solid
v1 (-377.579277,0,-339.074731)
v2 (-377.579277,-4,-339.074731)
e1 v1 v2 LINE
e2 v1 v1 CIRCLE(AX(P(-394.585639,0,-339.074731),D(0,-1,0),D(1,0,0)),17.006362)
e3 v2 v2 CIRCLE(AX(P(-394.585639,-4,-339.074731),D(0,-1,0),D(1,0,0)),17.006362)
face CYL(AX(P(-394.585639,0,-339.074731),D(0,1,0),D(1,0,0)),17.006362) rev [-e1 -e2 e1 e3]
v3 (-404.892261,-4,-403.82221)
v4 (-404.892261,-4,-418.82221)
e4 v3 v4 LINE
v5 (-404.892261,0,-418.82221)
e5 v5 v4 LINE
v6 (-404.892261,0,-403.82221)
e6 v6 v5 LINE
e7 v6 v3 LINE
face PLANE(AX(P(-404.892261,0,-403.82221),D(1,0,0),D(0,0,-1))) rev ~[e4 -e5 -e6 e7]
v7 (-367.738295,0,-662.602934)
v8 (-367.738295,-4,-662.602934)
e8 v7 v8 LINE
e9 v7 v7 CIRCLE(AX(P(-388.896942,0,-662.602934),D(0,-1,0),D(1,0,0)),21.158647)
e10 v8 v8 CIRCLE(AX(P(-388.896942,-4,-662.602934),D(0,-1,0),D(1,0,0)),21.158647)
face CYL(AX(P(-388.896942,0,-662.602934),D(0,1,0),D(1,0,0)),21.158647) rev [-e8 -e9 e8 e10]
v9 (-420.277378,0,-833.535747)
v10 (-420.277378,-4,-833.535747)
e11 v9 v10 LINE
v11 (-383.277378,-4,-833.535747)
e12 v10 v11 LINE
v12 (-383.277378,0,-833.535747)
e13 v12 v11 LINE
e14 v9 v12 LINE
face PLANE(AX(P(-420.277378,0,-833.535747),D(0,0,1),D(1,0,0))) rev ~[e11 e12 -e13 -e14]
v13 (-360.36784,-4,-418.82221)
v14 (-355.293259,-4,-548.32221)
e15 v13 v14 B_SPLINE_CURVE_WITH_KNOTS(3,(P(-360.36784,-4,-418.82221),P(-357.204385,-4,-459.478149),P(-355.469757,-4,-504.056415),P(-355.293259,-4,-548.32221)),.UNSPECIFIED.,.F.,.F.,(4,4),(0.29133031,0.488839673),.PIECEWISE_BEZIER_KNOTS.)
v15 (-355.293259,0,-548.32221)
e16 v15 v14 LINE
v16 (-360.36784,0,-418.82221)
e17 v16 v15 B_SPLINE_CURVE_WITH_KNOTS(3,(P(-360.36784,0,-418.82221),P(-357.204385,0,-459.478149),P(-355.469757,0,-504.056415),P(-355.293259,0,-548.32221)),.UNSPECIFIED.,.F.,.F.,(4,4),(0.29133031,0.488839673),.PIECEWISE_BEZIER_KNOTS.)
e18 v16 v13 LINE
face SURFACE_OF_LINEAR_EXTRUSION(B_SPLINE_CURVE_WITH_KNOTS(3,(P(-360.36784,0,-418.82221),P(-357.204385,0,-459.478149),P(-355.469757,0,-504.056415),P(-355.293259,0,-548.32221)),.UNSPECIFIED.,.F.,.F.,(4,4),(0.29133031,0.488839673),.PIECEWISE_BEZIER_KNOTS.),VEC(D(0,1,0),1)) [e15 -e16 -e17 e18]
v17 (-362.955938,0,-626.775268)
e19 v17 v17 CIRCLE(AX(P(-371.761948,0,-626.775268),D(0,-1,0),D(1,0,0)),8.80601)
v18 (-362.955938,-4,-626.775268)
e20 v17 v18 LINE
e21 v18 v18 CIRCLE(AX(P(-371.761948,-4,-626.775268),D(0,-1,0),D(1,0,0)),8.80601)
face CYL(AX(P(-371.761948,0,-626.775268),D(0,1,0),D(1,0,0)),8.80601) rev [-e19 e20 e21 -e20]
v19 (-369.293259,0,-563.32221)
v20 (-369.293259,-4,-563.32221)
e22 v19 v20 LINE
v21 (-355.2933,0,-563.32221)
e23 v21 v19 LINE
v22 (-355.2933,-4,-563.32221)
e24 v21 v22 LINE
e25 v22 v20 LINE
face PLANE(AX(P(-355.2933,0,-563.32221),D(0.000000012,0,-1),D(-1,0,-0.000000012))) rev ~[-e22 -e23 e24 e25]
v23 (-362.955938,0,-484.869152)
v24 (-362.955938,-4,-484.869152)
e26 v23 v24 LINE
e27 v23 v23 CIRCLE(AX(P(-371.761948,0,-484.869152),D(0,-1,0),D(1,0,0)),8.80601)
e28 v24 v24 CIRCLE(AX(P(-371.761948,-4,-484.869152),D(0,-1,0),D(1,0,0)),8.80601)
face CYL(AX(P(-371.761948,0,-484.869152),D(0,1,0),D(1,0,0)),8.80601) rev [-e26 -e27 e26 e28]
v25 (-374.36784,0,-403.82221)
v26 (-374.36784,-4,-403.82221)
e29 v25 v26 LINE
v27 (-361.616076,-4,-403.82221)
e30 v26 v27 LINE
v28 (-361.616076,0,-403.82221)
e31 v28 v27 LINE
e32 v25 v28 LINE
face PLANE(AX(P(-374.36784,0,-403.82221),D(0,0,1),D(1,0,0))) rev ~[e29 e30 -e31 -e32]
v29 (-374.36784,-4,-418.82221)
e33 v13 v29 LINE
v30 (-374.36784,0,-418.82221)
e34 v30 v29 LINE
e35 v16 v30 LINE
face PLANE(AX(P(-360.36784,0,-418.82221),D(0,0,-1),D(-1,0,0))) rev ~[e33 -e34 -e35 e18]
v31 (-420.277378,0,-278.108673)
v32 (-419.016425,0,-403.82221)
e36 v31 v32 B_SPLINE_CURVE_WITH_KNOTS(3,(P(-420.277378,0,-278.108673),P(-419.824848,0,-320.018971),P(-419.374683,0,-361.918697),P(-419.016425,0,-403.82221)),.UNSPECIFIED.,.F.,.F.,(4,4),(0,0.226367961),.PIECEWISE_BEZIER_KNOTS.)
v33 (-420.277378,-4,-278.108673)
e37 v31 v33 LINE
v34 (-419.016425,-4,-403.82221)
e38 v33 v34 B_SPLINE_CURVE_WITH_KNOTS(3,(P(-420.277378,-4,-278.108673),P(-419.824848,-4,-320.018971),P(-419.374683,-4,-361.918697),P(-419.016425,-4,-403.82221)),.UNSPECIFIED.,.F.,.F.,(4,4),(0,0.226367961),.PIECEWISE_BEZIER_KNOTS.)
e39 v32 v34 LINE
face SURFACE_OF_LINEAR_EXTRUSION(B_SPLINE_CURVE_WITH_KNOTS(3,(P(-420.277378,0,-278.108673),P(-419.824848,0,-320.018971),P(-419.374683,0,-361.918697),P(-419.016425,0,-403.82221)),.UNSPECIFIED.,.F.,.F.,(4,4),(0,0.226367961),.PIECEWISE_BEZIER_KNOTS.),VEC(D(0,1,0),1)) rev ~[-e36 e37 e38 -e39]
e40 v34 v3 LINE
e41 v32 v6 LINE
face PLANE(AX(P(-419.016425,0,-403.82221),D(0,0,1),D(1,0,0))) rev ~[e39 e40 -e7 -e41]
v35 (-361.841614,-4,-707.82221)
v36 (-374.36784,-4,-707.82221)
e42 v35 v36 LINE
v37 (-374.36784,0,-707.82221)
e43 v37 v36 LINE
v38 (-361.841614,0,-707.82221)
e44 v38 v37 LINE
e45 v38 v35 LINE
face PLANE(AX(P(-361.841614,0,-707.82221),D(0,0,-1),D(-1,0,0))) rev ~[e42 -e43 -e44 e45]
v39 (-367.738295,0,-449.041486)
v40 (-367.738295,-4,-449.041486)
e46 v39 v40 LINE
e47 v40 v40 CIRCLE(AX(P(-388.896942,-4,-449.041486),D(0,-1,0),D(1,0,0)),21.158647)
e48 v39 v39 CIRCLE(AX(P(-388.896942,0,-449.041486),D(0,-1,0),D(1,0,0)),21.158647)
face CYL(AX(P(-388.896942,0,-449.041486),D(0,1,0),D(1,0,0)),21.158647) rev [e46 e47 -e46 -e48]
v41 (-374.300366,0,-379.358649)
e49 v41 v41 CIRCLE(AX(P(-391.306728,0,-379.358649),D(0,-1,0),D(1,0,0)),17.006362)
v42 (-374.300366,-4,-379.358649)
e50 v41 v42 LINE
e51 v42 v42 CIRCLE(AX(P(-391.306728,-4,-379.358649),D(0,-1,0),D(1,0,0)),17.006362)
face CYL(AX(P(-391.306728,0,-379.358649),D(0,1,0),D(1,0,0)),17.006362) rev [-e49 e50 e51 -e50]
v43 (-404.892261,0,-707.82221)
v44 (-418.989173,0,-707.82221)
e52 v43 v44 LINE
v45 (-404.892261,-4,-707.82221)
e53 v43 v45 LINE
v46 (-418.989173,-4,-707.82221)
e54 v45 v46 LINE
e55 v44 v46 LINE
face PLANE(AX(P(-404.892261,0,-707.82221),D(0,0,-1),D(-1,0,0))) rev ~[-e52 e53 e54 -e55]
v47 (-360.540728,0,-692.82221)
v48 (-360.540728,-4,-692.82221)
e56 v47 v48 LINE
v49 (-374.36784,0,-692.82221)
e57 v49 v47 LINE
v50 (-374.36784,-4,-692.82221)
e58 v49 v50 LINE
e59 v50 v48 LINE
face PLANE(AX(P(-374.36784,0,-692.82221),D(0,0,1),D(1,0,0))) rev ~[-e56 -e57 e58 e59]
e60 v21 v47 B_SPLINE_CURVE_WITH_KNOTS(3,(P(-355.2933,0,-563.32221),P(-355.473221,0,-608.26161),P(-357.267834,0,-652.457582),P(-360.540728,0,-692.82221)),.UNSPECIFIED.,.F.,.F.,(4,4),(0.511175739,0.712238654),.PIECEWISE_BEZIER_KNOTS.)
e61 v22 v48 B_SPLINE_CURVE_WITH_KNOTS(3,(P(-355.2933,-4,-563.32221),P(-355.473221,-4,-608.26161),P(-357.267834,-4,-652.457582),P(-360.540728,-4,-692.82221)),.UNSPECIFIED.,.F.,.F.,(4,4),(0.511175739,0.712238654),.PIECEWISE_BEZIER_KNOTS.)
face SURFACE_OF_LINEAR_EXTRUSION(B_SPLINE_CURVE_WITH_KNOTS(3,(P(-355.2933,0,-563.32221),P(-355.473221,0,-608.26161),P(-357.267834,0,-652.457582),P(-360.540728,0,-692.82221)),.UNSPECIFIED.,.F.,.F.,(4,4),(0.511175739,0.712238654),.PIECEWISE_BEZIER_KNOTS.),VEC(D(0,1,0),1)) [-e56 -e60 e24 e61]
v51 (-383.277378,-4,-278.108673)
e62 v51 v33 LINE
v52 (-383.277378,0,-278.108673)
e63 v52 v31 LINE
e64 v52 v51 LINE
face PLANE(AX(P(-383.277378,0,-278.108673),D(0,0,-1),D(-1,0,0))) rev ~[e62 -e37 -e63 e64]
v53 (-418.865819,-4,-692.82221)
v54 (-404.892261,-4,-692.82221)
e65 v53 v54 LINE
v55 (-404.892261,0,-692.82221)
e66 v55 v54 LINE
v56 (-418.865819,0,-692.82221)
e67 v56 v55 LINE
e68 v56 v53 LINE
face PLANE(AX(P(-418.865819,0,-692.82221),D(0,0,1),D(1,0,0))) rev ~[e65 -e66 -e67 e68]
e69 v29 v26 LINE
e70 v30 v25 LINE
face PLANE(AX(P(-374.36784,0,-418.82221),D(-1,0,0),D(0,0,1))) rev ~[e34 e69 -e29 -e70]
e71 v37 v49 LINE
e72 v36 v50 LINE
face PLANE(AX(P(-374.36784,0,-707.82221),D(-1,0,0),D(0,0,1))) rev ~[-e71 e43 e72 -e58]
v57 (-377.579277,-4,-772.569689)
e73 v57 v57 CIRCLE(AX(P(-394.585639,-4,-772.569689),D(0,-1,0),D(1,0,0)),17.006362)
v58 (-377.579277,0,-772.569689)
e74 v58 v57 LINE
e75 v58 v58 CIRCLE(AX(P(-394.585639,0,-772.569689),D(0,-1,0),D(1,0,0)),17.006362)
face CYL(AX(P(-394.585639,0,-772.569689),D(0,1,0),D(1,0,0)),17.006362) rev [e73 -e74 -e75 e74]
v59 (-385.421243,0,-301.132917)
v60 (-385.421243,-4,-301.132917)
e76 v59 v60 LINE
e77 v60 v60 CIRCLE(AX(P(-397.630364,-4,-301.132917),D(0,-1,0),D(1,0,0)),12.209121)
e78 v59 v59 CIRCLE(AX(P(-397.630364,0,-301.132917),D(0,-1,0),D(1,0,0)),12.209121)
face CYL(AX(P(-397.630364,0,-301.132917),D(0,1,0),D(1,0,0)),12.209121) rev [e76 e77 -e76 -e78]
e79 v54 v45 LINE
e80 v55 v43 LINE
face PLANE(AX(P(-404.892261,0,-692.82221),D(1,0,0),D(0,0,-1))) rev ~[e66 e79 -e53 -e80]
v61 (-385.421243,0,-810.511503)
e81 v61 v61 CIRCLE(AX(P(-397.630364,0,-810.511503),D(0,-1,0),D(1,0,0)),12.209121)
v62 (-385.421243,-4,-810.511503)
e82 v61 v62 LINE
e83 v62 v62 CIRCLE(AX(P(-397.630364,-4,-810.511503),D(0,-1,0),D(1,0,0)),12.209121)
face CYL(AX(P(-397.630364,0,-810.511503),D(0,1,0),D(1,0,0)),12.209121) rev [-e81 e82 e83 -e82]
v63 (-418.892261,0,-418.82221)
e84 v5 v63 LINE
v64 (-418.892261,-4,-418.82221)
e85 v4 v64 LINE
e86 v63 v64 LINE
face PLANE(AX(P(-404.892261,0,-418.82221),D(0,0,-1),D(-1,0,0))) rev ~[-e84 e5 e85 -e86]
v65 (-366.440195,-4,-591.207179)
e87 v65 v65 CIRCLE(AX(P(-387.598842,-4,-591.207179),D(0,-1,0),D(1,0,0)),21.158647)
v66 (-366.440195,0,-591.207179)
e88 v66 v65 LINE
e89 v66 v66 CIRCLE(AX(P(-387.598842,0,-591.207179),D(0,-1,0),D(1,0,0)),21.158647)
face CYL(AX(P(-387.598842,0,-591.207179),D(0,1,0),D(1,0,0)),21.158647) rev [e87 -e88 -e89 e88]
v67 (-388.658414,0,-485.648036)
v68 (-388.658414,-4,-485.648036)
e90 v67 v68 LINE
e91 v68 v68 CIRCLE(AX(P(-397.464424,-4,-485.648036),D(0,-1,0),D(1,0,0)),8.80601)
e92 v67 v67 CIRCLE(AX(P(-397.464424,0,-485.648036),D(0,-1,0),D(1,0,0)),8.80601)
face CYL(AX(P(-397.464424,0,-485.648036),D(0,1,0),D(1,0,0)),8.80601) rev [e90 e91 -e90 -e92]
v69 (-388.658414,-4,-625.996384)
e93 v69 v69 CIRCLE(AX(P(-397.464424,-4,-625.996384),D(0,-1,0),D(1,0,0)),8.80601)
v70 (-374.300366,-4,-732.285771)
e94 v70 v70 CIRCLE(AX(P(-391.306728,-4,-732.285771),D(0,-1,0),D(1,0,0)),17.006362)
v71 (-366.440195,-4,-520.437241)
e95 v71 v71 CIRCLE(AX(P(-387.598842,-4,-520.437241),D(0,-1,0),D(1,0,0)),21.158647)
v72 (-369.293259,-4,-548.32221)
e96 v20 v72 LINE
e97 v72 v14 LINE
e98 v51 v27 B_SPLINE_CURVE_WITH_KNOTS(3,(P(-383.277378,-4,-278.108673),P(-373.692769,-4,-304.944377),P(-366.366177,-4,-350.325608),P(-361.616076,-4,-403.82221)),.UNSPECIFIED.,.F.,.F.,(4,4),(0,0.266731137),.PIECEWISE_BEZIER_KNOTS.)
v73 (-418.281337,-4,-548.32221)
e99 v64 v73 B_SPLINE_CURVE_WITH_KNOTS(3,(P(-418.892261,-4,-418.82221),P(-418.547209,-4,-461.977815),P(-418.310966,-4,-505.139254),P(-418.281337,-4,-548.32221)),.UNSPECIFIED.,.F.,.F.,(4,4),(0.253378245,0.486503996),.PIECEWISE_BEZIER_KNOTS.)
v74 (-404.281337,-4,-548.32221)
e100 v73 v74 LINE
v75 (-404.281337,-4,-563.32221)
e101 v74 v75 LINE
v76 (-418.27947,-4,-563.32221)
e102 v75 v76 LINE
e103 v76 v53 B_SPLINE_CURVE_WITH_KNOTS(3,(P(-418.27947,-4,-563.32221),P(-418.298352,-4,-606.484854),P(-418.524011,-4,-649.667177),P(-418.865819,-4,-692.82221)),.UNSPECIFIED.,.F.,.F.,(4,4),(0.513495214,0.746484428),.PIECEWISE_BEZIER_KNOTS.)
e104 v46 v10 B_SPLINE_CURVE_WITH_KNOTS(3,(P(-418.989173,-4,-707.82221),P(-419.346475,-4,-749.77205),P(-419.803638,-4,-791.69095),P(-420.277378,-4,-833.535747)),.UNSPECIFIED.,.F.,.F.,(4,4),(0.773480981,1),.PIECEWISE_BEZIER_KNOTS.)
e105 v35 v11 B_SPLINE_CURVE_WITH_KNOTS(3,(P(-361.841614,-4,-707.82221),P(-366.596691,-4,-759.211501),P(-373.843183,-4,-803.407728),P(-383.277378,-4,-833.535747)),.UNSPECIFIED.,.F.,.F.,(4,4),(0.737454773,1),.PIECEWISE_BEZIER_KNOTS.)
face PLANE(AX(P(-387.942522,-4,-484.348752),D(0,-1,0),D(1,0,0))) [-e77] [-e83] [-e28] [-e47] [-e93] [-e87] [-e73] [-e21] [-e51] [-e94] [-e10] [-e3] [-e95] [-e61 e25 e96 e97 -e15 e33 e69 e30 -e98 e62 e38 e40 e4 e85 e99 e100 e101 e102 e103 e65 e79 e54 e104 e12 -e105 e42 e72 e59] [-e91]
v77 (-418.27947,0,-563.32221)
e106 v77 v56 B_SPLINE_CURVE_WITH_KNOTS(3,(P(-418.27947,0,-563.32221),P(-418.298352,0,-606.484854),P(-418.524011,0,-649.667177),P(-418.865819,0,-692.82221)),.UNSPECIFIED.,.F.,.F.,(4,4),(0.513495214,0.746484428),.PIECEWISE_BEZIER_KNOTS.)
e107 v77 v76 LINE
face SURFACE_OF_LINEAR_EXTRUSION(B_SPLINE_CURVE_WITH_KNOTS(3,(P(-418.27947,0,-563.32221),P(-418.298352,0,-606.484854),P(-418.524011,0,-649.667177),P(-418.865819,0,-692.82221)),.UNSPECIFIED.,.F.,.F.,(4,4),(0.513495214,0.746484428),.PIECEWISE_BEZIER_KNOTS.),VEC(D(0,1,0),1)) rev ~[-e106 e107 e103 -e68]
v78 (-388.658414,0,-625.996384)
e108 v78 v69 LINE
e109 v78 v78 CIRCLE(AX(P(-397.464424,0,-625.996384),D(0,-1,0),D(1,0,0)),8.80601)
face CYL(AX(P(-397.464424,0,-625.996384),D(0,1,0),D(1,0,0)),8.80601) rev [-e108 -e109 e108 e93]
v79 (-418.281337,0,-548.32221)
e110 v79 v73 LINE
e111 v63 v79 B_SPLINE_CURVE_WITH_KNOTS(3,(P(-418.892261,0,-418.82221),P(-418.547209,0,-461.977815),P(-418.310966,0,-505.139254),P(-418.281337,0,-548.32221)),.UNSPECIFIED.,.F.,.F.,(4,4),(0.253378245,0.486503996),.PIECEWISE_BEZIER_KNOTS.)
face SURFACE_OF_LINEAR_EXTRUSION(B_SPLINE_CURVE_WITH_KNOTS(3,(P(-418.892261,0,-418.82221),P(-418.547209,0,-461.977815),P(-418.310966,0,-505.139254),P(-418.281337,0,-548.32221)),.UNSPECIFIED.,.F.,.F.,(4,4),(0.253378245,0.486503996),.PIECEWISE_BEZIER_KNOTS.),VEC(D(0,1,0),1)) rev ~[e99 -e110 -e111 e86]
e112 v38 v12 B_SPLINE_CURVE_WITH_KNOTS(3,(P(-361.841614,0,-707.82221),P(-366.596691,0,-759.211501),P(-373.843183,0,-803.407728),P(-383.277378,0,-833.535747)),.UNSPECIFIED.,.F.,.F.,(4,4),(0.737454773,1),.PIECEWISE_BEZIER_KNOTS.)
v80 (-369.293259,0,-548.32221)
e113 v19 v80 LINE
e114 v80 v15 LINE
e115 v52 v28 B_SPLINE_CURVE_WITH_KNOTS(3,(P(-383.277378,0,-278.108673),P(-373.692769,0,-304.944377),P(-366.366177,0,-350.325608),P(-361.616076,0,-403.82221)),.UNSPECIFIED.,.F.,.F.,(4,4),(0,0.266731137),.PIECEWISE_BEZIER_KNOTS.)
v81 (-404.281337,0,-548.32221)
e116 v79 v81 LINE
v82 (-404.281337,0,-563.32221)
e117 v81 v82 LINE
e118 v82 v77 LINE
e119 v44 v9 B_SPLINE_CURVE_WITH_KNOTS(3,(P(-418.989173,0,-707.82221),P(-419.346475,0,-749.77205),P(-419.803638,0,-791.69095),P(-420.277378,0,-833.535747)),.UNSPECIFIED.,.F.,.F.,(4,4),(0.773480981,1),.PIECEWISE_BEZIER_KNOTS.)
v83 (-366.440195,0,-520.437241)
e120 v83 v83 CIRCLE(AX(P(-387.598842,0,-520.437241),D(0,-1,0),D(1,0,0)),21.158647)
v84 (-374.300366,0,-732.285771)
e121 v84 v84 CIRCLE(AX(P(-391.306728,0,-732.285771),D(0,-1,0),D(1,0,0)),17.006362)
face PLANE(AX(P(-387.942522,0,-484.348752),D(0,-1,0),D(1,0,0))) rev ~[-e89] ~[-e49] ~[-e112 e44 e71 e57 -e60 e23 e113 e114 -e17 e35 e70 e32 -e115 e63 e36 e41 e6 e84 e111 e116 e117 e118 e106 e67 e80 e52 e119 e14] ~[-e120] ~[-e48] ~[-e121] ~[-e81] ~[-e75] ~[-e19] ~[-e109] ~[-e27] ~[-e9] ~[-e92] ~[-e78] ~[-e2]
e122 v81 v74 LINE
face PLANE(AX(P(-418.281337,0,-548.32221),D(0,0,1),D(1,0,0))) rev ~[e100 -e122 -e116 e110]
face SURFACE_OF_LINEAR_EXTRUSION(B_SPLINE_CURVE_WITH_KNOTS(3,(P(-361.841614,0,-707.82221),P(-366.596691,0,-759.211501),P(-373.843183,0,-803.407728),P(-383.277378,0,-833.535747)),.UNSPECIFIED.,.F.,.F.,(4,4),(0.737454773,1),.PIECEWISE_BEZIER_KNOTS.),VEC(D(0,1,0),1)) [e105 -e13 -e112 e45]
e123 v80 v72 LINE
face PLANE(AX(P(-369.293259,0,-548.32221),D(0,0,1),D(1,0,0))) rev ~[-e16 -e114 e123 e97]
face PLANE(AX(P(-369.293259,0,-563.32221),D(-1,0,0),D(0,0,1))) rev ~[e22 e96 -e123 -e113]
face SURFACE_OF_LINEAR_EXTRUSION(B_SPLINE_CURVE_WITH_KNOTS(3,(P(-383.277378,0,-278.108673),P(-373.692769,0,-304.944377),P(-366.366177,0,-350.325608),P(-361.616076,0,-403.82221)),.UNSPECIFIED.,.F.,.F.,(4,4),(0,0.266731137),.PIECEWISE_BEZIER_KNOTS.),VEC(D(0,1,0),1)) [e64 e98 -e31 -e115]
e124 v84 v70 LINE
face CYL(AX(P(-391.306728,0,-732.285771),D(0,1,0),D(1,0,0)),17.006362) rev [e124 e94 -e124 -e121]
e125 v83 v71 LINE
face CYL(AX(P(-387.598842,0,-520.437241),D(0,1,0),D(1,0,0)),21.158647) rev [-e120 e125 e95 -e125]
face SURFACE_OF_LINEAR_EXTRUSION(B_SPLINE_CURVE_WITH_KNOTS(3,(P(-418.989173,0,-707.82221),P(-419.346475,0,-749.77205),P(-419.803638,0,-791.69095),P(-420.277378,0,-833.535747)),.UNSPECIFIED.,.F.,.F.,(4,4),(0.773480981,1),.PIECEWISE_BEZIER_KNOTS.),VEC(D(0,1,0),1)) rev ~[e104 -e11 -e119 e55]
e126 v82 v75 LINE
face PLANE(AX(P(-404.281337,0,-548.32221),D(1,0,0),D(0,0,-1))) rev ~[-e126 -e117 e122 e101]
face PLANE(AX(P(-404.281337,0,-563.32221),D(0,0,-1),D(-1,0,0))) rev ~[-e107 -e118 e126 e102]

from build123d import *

# Parameters (mm, degrees)
F0_R     = 21.1586469213
F0_R_2   = 8.806010366
F0_R_3   = 12.2091210128
F0_R_4   = 17.006361888
F1_DEPTH = 4


# Not quite as in the source:
# - ends of sketch curves that miss each other by under 0.0002 mm in the source are joined


with BuildPart() as f1:
    # F0 (on Front) → F1 (new body)
    with BuildSketch(Plane.XZ):
        with BuildLine():
            Line((-404.2813370244, -555.8222100041), (-369.2932587578, -555.8222100041))
            Line((-369.2932587578, -555.8222100041), (-369.2932587578, -548.3222100041))
            Line((-369.2932587578, -548.3222100041), (-355.2932587578, -548.3222100041))
            add(Edge.make_bspline(
                [(-360.3678395822, -418.8222100041), (-357.2043853814, -459.4781491099), (-355.4697568796, -504.0564149856), (-355.2932587578, -548.3222100041)],
                knots=[0.2913303101, 0.2913303101, 0.2913303101, 0.2913303101, 0.4888396728, 0.4888396728, 0.4888396728, 0.4888396728], degree=3))
            Line((-360.3678395822, -418.8222100041), (-374.3678395822, -418.8222100041))
            Line((-374.3678395822, -418.8222100041), (-374.3678395822, -411.3222100041))
            Line((-374.3678395822, -411.3222100041), (-404.8922608862, -411.3222100041))
            Line((-404.8922608862, -411.3222100041), (-404.8922608862, -418.8222100041))
            Line((-404.8922608862, -418.8222100041), (-418.8922608862, -418.8222100041))
            add(Edge.make_bspline(
                [(-418.8922608862, -418.8222100041), (-418.5472091576, -461.9778150808), (-418.3109664436, -505.1392537968), (-418.2813370244, -548.3222100041)],
                knots=[0.2533782445, 0.2533782445, 0.2533782445, 0.2533782445, 0.4865039964, 0.4865039964, 0.4865039964, 0.4865039964], degree=3))
            Line((-418.2813370244, -548.3222100041), (-404.2813370244, -548.3222100041))
            Line((-404.2813370244, -548.3222100041), (-404.2813370244, -555.8222100041))
        make_face()
        with Locations((-387.5988423824, -520.4372406006)):
            Circle(F0_R, mode=Mode.SUBTRACT)
        with Locations((-397.4644243717, -485.6480360031)):
            Circle(F0_R_2, mode=Mode.SUBTRACT)
        with Locations((-371.7619478703, -484.8691523075)):
            Circle(F0_R_2, mode=Mode.SUBTRACT)
        with Locations((-388.8969421387, -449.0414857864)):
            Circle(F0_R, mode=Mode.SUBTRACT)
        with BuildLine():
            Line((-369.2932587578, -563.3222100041), (-369.2932587578, -555.8222100041))
            Line((-369.2932587578, -555.8222100041), (-404.2813370244, -555.8222100041))
            Line((-404.2813370244, -555.8222100041), (-404.2813370244, -563.3222100041))
            Line((-404.2813370244, -563.3222100041), (-418.2794696915, -563.3222100041))
            add(Edge.make_bspline(
                [(-418.2794696915, -563.3222100041), (-418.2983515169, -606.4848543261), (-418.524010714, -649.6671773036), (-418.8658189061, -692.8222100041)],
                knots=[0.5134952141, 0.5134952141, 0.5134952141, 0.5134952141, 0.746484428, 0.746484428, 0.746484428, 0.746484428], degree=3))
            Line((-418.8658189061, -692.8222100041), (-404.8922608862, -692.8222100041))
            Line((-404.8922608862, -692.8222100041), (-404.8922608862, -700.3222100041))
            Line((-404.8922608862, -700.3222100041), (-374.3678395822, -700.3222100041))
            Line((-374.3678395822, -700.3222100041), (-374.3678395822, -692.8222100041))
            Line((-374.3678395822, -692.8222100041), (-360.5407278397, -692.8222100041))
            add(Edge.make_bspline(
                [(-355.2933001029, -563.3222098386), (-355.473221284, -608.2616104093), (-357.267833957, -652.4575821746), (-360.5407278397, -692.8222100041)],
                knots=[0.5111757389, 0.5111757389, 0.5111757389, 0.5111757389, 0.7122386539, 0.7122386539, 0.7122386539, 0.7122386539], degree=3))
            Line((-355.2933001029, -563.3222098386), (-369.2932587578, -563.3222100041))
        make_face()
        with Locations((-388.8969421387, -662.6029342218)):
            Circle(F0_R, mode=Mode.SUBTRACT)
        with Locations((-397.4644243717, -625.9963840052)):
            Circle(F0_R_2, mode=Mode.SUBTRACT)
        with Locations((-371.7619478703, -626.7752677008)):
            Circle(F0_R_2, mode=Mode.SUBTRACT)
        with Locations((-387.5988423824, -591.2071794077)):
            Circle(F0_R, mode=Mode.SUBTRACT)
        with BuildLine():
            add(Edge.make_bspline(
                [(-361.8416139057, -707.8222100042), (-366.5966911813, -759.211500512), (-373.8431834552, -803.4077276906), (-383.2773775989, -833.5357473143)],
                knots=[0.7374547732, 0.7374547732, 0.7374547732, 0.7374547732, 1, 1, 1, 1], degree=3))
            Line((-361.8416139057, -707.8222100041), (-374.3678395822, -707.8222100041))
            Line((-374.3678395822, -707.8222100041), (-374.3678395822, -700.3222100041))
            Line((-374.3678395822, -700.3222100041), (-404.8922608862, -700.3222100041))
            Line((-404.8922608862, -700.3222100041), (-404.8922608862, -707.8222100041))
            Line((-404.8922608862, -707.8222100041), (-418.8922608862, -707.8222100041))
            Line((-418.8922608862, -707.8222100041), (-418.9891725019, -707.8222100041))
            add(Edge.make_bspline(
                [(-418.9891725019, -707.8222100041), (-419.3464745558, -749.7720501318), (-419.8036381759, -791.690950422), (-420.2773775989, -833.5357473143)],
                knots=[0.7734809807, 0.7734809807, 0.7734809807, 0.7734809807, 1, 1, 1, 1], degree=3))
            Line((-420.2773775989, -833.5357473143), (-383.2773775989, -833.5357473143))
        make_face()
        with Locations((-397.6303637028, -810.5115026041)):
            Circle(F0_R_3, mode=Mode.SUBTRACT)
        with Locations((-394.5856392384, -772.5696891352)):
            Circle(F0_R_4, mode=Mode.SUBTRACT)
        with Locations((-391.3067281246, -732.2857707544)):
            Circle(F0_R_4, mode=Mode.SUBTRACT)
        with BuildLine():
            Line((-404.8922608862, -411.3222100041), (-374.3678395822, -411.3222100041))
            Line((-374.3678395822, -411.3222100041), (-374.3678395822, -403.8222100041))
            Line((-374.3678395822, -403.8222100041), (-361.6160762359, -403.8222100041))
            add(Edge.make_bspline(
                [(-383.2773775989, -278.108672694), (-373.6927686449, -304.944377163), (-366.3661772603, -350.3256078146), (-361.6160762359, -403.8222100042)],
                knots=[0, 0, 0, 0, 0.2667311371, 0.2667311371, 0.2667311371, 0.2667311371], degree=3))
            Line((-383.2773775989, -278.108672694), (-420.2773775989, -278.108672694))
            add(Edge.make_bspline(
                [(-420.2773775989, -278.108672694), (-419.8248476428, -320.0189708532), (-419.3746825014, -361.9186969271), (-419.0164252465, -403.8222100041)],
                knots=[0, 0, 0, 0, 0.2263679612, 0.2263679612, 0.2263679612, 0.2263679612], degree=3))
            Line((-419.0164252465, -403.8222100041), (-418.8922608862, -403.8222100041))
            Line((-418.8922608862, -403.8222100041), (-404.8922608862, -403.8222100041))
            Line((-404.8922608862, -403.8222100041), (-404.8922608862, -411.3222100041))
        make_face()
        with Locations((-391.3067281246, -379.3586492538)):
            Circle(F0_R_4, mode=Mode.SUBTRACT)
        with Locations((-394.5856392384, -339.0747308731)):
            Circle(F0_R_4, mode=Mode.SUBTRACT)
        with Locations((-397.6303637028, -301.1329174042)):
            Circle(F0_R_3, mode=Mode.SUBTRACT)
    extrude(amount=F1_DEPTH)


solid = f1.part
